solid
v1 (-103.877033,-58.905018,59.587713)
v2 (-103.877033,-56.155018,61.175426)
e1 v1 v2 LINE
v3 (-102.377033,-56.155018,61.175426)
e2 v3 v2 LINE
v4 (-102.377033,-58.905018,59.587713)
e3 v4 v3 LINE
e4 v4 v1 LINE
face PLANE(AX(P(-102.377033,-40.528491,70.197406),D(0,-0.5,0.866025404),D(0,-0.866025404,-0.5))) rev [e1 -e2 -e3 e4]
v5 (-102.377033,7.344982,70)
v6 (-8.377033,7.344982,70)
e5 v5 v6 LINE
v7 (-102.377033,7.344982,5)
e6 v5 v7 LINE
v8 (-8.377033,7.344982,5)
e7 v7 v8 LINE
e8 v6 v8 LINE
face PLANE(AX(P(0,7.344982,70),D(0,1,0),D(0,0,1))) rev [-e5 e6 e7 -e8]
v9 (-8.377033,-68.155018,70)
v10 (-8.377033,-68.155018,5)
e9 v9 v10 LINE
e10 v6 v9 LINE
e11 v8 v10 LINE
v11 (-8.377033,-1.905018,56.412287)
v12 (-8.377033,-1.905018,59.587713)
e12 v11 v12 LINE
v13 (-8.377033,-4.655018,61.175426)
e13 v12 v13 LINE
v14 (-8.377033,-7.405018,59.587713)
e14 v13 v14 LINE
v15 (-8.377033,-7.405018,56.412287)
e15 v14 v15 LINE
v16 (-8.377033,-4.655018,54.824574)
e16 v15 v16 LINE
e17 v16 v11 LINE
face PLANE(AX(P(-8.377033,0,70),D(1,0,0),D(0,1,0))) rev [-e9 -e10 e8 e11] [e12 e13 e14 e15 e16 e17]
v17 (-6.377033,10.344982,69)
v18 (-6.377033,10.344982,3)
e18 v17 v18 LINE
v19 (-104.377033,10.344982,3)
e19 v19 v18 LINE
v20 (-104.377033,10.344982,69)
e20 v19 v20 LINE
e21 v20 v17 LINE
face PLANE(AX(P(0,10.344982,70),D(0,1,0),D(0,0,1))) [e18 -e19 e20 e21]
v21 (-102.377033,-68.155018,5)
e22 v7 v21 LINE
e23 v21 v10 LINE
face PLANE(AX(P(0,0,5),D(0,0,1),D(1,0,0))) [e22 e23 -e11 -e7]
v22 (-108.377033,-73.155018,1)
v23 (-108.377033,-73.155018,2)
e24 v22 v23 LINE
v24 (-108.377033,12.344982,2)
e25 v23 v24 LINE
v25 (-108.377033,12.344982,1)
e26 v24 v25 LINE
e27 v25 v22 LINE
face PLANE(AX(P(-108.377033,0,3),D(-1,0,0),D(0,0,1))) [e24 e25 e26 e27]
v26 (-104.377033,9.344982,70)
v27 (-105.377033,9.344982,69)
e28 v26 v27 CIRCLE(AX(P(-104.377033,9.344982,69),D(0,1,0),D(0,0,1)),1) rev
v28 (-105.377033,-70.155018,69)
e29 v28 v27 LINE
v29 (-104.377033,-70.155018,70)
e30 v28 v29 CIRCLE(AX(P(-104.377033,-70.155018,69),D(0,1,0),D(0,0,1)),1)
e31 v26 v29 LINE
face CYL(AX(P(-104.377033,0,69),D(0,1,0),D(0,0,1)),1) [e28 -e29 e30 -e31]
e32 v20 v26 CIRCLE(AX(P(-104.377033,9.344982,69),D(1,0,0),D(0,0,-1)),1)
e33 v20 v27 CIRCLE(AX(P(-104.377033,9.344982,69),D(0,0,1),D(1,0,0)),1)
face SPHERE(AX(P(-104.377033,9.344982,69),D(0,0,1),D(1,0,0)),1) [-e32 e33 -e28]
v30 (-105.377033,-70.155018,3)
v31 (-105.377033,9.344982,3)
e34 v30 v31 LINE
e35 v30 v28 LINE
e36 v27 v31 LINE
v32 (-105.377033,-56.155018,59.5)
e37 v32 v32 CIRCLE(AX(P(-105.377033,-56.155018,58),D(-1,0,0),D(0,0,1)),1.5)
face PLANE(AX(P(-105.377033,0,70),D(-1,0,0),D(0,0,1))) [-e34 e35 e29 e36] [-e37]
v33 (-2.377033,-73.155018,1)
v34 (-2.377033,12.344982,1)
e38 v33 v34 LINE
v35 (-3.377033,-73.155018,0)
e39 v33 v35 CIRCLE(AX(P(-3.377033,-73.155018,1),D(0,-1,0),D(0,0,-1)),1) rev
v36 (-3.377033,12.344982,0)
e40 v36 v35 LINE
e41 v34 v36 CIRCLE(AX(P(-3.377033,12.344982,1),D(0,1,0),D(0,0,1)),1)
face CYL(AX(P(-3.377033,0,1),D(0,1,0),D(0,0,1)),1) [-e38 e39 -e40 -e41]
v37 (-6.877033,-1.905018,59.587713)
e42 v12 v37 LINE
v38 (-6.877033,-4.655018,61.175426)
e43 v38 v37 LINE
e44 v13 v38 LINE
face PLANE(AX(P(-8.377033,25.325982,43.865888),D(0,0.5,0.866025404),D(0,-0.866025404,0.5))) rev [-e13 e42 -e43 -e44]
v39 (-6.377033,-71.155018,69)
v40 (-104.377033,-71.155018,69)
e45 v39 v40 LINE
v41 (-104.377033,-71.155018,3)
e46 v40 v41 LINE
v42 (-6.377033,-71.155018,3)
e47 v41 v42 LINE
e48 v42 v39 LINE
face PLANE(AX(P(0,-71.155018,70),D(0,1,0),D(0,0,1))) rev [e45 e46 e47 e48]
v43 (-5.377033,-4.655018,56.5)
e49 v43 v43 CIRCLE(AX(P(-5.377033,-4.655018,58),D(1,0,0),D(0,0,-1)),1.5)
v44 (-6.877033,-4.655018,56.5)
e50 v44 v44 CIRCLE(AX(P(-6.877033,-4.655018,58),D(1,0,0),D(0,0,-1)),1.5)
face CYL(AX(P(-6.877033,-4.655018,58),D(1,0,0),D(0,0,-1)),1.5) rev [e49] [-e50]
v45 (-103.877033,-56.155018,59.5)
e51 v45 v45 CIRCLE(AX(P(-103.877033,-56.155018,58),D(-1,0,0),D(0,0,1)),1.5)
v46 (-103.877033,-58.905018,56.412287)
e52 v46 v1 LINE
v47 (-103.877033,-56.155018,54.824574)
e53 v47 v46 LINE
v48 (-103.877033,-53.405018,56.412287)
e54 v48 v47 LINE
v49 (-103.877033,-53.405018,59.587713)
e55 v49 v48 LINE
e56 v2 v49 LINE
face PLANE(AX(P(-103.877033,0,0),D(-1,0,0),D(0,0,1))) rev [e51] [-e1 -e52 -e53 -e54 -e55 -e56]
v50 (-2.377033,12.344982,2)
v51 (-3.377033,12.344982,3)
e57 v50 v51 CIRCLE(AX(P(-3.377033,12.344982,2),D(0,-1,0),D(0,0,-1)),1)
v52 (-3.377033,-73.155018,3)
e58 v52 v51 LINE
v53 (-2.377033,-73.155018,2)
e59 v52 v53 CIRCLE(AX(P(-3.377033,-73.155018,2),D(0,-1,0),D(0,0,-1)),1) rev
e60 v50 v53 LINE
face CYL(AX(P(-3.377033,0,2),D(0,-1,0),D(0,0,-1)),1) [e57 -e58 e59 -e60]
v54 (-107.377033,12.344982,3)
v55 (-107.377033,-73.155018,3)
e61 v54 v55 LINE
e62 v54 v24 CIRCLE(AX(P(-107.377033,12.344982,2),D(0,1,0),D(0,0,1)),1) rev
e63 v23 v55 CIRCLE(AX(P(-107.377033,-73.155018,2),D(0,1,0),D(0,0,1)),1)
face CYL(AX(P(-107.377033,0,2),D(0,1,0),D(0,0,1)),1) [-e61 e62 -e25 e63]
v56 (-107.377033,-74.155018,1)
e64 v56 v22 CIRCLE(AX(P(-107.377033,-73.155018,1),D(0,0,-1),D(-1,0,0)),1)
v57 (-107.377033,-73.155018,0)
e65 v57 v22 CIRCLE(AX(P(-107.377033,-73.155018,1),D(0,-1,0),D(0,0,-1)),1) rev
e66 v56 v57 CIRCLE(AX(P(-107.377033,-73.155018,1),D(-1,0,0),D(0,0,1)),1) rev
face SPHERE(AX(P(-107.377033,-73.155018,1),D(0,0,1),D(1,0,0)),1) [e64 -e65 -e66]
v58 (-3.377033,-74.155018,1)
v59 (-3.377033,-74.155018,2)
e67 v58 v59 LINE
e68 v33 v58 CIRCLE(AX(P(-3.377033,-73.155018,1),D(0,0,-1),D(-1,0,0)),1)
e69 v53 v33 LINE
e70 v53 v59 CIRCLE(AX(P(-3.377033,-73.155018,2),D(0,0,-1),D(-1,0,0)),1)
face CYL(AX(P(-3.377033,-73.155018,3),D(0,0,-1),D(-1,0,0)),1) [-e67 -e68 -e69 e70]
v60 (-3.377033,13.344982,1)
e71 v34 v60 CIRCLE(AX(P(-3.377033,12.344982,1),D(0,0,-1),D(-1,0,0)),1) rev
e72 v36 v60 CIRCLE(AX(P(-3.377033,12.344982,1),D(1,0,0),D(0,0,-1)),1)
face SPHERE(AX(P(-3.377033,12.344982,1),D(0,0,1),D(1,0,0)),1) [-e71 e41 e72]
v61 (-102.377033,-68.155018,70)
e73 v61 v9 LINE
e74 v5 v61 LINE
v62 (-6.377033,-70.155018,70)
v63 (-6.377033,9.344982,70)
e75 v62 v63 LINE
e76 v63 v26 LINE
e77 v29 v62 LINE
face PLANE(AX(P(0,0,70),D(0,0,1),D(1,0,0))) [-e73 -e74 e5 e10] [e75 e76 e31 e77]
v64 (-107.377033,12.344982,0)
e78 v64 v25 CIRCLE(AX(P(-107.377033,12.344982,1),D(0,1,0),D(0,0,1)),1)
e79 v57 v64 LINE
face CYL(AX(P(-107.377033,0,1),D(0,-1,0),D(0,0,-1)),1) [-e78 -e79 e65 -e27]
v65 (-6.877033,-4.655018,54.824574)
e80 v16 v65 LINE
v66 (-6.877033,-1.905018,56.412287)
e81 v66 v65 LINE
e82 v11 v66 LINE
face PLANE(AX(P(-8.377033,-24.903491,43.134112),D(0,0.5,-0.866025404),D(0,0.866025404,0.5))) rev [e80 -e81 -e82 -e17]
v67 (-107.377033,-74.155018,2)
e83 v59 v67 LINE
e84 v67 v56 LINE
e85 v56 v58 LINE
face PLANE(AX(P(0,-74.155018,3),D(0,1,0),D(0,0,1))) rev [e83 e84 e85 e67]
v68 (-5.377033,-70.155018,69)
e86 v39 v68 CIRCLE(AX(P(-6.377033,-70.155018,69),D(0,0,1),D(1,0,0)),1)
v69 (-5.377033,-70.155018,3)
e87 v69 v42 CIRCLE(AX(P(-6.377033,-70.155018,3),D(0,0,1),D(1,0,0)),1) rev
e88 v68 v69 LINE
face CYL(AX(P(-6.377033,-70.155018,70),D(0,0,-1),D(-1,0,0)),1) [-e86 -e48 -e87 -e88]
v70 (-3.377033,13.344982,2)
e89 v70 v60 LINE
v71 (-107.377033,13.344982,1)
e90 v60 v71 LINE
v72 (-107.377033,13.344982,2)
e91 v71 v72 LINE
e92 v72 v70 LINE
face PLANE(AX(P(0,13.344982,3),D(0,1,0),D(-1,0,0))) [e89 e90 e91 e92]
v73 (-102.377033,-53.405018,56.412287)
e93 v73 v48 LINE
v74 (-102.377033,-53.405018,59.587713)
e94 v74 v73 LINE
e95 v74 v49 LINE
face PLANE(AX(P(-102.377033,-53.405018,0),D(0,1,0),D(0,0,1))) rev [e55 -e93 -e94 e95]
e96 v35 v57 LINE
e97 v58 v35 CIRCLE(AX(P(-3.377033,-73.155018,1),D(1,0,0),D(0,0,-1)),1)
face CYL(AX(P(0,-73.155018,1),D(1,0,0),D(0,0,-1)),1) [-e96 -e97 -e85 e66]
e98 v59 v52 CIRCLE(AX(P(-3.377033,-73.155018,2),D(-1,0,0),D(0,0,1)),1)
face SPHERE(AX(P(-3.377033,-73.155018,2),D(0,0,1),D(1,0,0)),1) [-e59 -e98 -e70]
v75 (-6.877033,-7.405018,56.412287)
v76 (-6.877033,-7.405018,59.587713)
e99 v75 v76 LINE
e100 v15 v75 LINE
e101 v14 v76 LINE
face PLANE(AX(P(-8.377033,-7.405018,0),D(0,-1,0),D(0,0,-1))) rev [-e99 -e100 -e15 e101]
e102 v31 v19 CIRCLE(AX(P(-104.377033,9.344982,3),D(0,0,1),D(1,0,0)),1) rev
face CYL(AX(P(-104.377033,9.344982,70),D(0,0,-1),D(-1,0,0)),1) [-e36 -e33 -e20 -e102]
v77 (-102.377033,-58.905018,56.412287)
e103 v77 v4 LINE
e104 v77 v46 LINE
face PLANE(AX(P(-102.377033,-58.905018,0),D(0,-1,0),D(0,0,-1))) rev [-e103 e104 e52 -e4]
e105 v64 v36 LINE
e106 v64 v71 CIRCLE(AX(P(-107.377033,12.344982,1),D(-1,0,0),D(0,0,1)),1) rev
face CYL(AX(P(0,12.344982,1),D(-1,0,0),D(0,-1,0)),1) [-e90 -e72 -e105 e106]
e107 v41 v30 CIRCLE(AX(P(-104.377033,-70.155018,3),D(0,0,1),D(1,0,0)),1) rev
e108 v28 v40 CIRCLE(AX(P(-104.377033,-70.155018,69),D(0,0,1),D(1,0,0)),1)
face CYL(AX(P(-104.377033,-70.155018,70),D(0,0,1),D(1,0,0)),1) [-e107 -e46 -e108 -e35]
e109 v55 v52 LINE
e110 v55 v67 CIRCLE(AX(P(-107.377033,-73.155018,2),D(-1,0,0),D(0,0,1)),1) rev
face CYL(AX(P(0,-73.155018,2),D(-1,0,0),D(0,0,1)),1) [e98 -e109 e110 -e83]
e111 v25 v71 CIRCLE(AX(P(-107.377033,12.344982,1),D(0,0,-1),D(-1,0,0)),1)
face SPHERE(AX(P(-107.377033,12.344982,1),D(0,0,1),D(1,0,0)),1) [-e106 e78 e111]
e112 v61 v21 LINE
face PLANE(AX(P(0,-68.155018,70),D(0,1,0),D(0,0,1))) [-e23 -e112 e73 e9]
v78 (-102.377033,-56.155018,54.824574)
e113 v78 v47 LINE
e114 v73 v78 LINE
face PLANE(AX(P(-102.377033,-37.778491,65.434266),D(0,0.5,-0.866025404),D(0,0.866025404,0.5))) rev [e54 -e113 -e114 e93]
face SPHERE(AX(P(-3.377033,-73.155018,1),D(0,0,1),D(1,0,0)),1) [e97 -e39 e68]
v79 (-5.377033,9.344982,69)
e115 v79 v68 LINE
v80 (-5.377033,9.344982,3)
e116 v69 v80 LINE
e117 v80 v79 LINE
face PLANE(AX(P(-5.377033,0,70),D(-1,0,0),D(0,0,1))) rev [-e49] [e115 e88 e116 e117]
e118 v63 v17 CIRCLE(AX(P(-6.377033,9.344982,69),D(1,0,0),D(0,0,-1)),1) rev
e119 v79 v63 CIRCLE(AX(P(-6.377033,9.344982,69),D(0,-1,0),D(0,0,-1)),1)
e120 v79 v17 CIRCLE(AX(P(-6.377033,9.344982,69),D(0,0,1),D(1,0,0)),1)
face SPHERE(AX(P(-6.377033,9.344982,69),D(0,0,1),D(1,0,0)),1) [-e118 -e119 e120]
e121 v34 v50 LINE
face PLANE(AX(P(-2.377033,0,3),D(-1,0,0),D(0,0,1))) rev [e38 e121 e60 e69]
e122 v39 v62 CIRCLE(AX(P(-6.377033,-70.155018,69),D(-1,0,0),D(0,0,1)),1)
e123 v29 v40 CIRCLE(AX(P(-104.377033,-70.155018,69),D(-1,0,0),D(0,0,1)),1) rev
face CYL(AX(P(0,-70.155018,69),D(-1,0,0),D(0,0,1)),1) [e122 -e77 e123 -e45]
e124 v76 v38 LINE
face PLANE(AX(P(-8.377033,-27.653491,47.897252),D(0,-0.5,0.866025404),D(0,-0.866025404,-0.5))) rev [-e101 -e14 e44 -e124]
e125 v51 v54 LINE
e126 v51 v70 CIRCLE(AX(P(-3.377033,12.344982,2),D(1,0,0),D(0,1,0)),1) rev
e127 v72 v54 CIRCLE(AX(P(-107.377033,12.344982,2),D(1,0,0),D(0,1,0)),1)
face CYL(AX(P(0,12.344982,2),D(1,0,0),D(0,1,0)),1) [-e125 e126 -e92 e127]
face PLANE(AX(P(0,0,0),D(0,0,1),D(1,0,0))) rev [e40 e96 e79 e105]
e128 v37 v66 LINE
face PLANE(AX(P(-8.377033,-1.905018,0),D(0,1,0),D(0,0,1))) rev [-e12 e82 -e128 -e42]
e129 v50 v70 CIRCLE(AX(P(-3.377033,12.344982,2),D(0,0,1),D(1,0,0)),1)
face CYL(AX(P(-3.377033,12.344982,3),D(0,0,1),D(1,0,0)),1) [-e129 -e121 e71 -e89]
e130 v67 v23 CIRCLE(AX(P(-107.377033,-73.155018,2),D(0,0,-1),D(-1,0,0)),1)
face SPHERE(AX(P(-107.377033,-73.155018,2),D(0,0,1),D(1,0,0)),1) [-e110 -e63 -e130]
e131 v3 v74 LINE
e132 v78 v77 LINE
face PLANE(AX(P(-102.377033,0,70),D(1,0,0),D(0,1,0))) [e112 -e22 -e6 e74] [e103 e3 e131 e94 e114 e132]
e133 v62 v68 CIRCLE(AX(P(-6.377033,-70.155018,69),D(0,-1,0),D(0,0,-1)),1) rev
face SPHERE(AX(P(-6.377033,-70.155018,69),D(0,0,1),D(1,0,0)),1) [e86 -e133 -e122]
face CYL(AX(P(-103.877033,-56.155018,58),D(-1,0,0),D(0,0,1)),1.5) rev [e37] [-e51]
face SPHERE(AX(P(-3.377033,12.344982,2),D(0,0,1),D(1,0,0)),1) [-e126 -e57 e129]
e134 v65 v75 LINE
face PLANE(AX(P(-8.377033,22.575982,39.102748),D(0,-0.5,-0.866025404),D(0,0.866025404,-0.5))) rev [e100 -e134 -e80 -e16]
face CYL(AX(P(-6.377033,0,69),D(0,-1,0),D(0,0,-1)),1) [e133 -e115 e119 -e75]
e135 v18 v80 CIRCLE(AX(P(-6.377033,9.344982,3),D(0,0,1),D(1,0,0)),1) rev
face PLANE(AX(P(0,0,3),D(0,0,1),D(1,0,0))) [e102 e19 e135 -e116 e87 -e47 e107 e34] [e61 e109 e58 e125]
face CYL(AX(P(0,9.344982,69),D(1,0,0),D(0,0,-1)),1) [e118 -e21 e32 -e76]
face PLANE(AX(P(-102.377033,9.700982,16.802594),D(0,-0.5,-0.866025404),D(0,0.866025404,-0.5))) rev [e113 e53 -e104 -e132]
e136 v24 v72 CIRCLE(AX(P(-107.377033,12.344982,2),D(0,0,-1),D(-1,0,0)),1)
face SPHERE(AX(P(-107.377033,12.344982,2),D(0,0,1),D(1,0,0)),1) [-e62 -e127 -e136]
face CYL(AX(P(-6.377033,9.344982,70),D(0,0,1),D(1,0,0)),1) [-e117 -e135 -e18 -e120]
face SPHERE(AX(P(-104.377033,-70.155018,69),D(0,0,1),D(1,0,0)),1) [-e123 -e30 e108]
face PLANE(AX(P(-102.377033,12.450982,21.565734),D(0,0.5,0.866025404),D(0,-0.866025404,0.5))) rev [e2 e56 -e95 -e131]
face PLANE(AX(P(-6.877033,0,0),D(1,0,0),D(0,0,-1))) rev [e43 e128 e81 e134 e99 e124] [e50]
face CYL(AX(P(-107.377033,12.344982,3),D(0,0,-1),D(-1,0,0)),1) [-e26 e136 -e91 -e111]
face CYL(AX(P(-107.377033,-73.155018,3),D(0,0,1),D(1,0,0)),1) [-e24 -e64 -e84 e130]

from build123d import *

# Parameters (mm, degrees)
ESQUISSE1_W             = 106
ESQUISSE1_H             = 87.5
ESQUISSE1_W_2           = 100
ESQUISSE1_H_2           = 81.5
BOSS_EXTRU_1_DEPTH      = 3
ESQUISSE1_32_W          = 100
ESQUISSE1_32_H          = 81.5
ESQUISSE1_32_W_2        = 94
ESQUISSE1_32_H_2        = 75.5
BOSS_EXTRU_2_DEPTH      = 70
ESQUISSE1_33_W          = 94
ESQUISSE1_33_H          = 75.5
BOSS_EXTRU_3_DEPTH      = 5
CONG_1_R                = 1
CONG_2_R                = 1
CONG_3_R                = 1
ESQUISSE13_R            = 1.5
ENL_V_MAT_EXTRU_1_DEPTH = 3
ESQUISSE13_3_R          = 1.5
ENL_V_MAT_EXTRU_2_DEPTH = 3
ESQUISSE13_4_R          = 1.5
BOSS_EXTRU_6_DEPTH      = 1.5
ESQUISSE11_R            = 1.5
ENL_V_MAT_EXTRU_6_DEPTH = 3
ESQUISSE11_11_R         = 5
ESQUISSE11_11_R_2       = 1.5
BOSS_EXTRU_8_DEPTH      = 1.5
ESQUISSE11_12_R         = 1.5
ENL_V_MAT_EXTRU_7_DEPTH = 1.5
CONG_5_R                = 1


with BuildPart() as part:
    # Esquisse1 → Boss.-Extru.1 (new body)
    with BuildSketch(Plane.XY):
        with Locations((-55.377032771, -30.405018472)):
            Rectangle(ESQUISSE1_W, ESQUISSE1_H)
        with Locations((-55.377032771, -30.405018472)):
            Rectangle(ESQUISSE1_W_2, ESQUISSE1_H_2, mode=Mode.SUBTRACT)
    extrude(amount=BOSS_EXTRU_1_DEPTH)

    # Esquisse1<32> → Boss.-Extru.2 (add)
    with BuildSketch(Plane.XY):
        with Locations((-55.377032771, -30.405018472)):
            Rectangle(ESQUISSE1_32_W, ESQUISSE1_32_H)
        with Locations((-55.377032771, -30.405018472)):
            Rectangle(ESQUISSE1_32_W_2, ESQUISSE1_32_H_2, mode=Mode.SUBTRACT)
    extrude(amount=BOSS_EXTRU_2_DEPTH)

    # Esquisse1<33> → Boss.-Extru.3 (add)
    with BuildSketch(Plane.XY):
        with Locations((-55.377032771, -30.405018472)):
            Rectangle(ESQUISSE1_33_W, ESQUISSE1_33_H)
    extrude(amount=BOSS_EXTRU_3_DEPTH)

    # Congé1
    cong_1_edges = [part.edges().sort_by_distance(p)[0] for p in [
        (-55.377032771, 10.344981528, 70),
        (-105.377032771, -30.405018472, 70),
        (-55.377032771, -71.155018472, 70),
        (-5.377032771, -30.405018472, 70),
    ]]
    fillet(cong_1_edges, radius=CONG_1_R)

    # Congé2
    cong_2_edges = [part.edges().sort_by_distance(p)[0] for p in [
        (-55.377032771, -74.155018472, 3),
        (-2.377032771, -30.405018472, 3),
        (-55.377032771, 13.344981528, 3),
        (-108.377032771, -30.405018472, 3),
    ]]
    fillet(cong_2_edges, radius=CONG_2_R)

    # Congé3
    # the kernel refuses this fillet: 1 mm, written as the material it takes off along each edge
    with BuildSketch(Plane(origin=(-107.377032771, -73.155018472, 2), x_dir=(-1, 0, 0), z_dir=(0, -1, 0))) as cong_3_piece_1_section:
        Polygon((0, 0), (CONG_3_R, 0), (CONG_3_R, -CONG_3_R), (0, -CONG_3_R), align=None)
    cong_3_piece_1 = extrude(amount=CONG_3_R, mode=Mode.PRIVATE)
    cong_3_piece_1 = cong_3_piece_1 - Plane(origin=(-107.377032771, -73.155018472, 2), x_dir=(0.7071067811865475, 0, -0.7071067811865475), z_dir=(0, -1, 0)) * Sphere(CONG_3_R, mode=Mode.PRIVATE)
    add(cong_3_piece_1, mode=Mode.SUBTRACT)
    with BuildSketch(Plane(origin=(-107.377032771, 12.344981528, 2), x_dir=(0, 1, 0), z_dir=(-1, 0, 0))) as cong_3_piece_2_section:
        Polygon((0, 0), (CONG_3_R, 0), (CONG_3_R, -CONG_3_R), (0, -CONG_3_R), align=None)
    cong_3_piece_2 = extrude(amount=CONG_3_R, mode=Mode.PRIVATE)
    cong_3_piece_2 = cong_3_piece_2 - Plane(origin=(-107.377032771, 12.344981528, 2), x_dir=(0, -0.7071067811865475, -0.7071067811865475), z_dir=(-1, 0, 0)) * Sphere(CONG_3_R, mode=Mode.PRIVATE)
    add(cong_3_piece_2, mode=Mode.SUBTRACT)
    with BuildSketch(Plane(origin=(-3.377032771, -73.155018472, 2), x_dir=(1, 0, 0), z_dir=(0, -1, 0))) as cong_3_piece_3_section:
        Polygon((0, 0), (CONG_3_R, 0), (CONG_3_R, CONG_3_R), (0, CONG_3_R), align=None)
    cong_3_piece_3 = extrude(amount=CONG_3_R, mode=Mode.PRIVATE)
    cong_3_piece_3 = cong_3_piece_3 - Plane(origin=(-3.377032771, -73.155018472, 2), x_dir=(-0.7071067811865475, 0, -0.7071067811865475), z_dir=(0, -1, 0)) * Sphere(CONG_3_R, mode=Mode.PRIVATE)
    add(cong_3_piece_3, mode=Mode.SUBTRACT)
    with BuildSketch(Plane(origin=(-3.377032771, 12.344981528, 2), x_dir=(0, 1, 0), z_dir=(1, 0, 0))) as cong_3_piece_4_section:
        Polygon((0, 0), (CONG_3_R, 0), (CONG_3_R, CONG_3_R), (0, CONG_3_R), align=None)
    cong_3_piece_4 = extrude(amount=CONG_3_R, mode=Mode.PRIVATE)
    cong_3_piece_4 = cong_3_piece_4 - Plane(origin=(-3.377032771, 12.344981528, 2), x_dir=(0, -0.7071067811865475, -0.7071067811865475), z_dir=(1, 0, 0)) * Sphere(CONG_3_R, mode=Mode.PRIVATE)
    add(cong_3_piece_4, mode=Mode.SUBTRACT)
    with BuildSketch(Plane(origin=(-3.377032771, -73.155018472, 1), x_dir=(1, 0, 0), z_dir=(0, 0, -1))) as cong_3_piece_5_section:
        Polygon((0, 0), (CONG_3_R, 0), (CONG_3_R, CONG_3_R), (0, CONG_3_R), align=None)
    cong_3_piece_5 = extrude(amount=CONG_3_R, mode=Mode.PRIVATE)
    cong_3_piece_5 = cong_3_piece_5 - Plane(origin=(-3.377032771, -73.155018472, 1), x_dir=(-0.7071067811865475, 0.7071067811865475, 0), z_dir=(0, 0, -1)) * Sphere(CONG_3_R, mode=Mode.PRIVATE)
    add(cong_3_piece_5, mode=Mode.SUBTRACT)
    with BuildSketch(Plane(origin=(-3.377032771, 12.344981528, 1), x_dir=(1, 0, 0), z_dir=(0, 0, -1))) as cong_3_piece_6_section:
        Polygon((0, 0), (CONG_3_R, 0), (CONG_3_R, -CONG_3_R), (0, -CONG_3_R), align=None)
    cong_3_piece_6 = extrude(amount=CONG_3_R, mode=Mode.PRIVATE)
    cong_3_piece_6 = cong_3_piece_6 - Plane(origin=(-3.377032771, 12.344981528, 1), x_dir=(-0.7071067811865475, -0.7071067811865475, 0), z_dir=(0, 0, -1)) * Sphere(CONG_3_R, mode=Mode.PRIVATE)
    add(cong_3_piece_6, mode=Mode.SUBTRACT)
    with BuildSketch(Plane(origin=(-107.377032771, -73.155018472, 1), x_dir=(-1, 0, 0), z_dir=(0, -1, 0))) as cong_3_piece_7_section:
        Polygon((0, 0), (CONG_3_R, 0), (CONG_3_R, CONG_3_R), (0, CONG_3_R), align=None)
    cong_3_piece_7 = extrude(amount=CONG_3_R, mode=Mode.PRIVATE)
    cong_3_piece_7 = cong_3_piece_7 - Plane(origin=(-107.377032771, -73.155018472, 1), x_dir=(0.7071067811865475, 0, 0.7071067811865475), z_dir=(0, -1, 0)) * Sphere(CONG_3_R, mode=Mode.PRIVATE)
    add(cong_3_piece_7, mode=Mode.SUBTRACT)
    with BuildSketch(Plane(origin=(-107.377032771, 12.344981528, 1), x_dir=(-1, 0, 0), z_dir=(0, 0, -1))) as cong_3_piece_8_section:
        Polygon((0, 0), (CONG_3_R, 0), (CONG_3_R, CONG_3_R), (0, CONG_3_R), align=None)
    cong_3_piece_8 = extrude(amount=CONG_3_R, mode=Mode.PRIVATE)
    cong_3_piece_8 = cong_3_piece_8 - Plane(origin=(-107.377032771, 12.344981528, 1), x_dir=(0.7071067811865475, -0.7071067811865475, 0), z_dir=(0, 0, -1)) * Sphere(CONG_3_R, mode=Mode.PRIVATE)
    add(cong_3_piece_8, mode=Mode.SUBTRACT)
    with BuildSketch(Plane(origin=(-2.377032771, -73.155018472, 0), x_dir=(0, 0, 1), z_dir=(0, 1, 0)), Plane(origin=(-108.377032771, 12.344981528, 0), x_dir=(0, 0, 1), z_dir=(0, -1, 0))) as cong_3_piece_9:
        with BuildLine():
            CenterArc((CONG_3_R, -CONG_3_R), CONG_3_R, 90, 90)
            Line((0, -CONG_3_R), (0, 0))
            Line((0, 0), (CONG_3_R, 0))
        make_face()
    extrude(amount=85.5, mode=Mode.SUBTRACT)
    with BuildSketch(Plane(origin=(-107.377032771, -74.155018472, 0), x_dir=(0, 0, 1), z_dir=(1, 0, 0)), Plane(origin=(-3.377032771, 13.344981528, 0), x_dir=(0, 0, 1), z_dir=(-1, 0, 0))) as cong_3_piece_10:
        with BuildLine():
            CenterArc((CONG_3_R, -CONG_3_R), CONG_3_R, 90, 90)
            Line((0, -CONG_3_R), (0, 0))
            Line((0, 0), (CONG_3_R, 0))
        make_face()
    extrude(amount=104, mode=Mode.SUBTRACT)
    with BuildSketch(Plane(origin=(-2.377032771, 13.344981528, 1), x_dir=(0, -1, 0), z_dir=(0, 0, 1)), Plane(origin=(-2.377032771, -74.155018472, 1), x_dir=(-1, 0, 0), z_dir=(0, 0, 1))) as cong_3_piece_11:
        with BuildLine():
            CenterArc((CONG_3_R, -CONG_3_R), CONG_3_R, 90, 90)
            Line((0, -CONG_3_R), (0, 0))
            Line((0, 0), (CONG_3_R, 0))
        make_face()
    extrude(amount=1, mode=Mode.SUBTRACT)
    with BuildSketch(Plane(origin=(-108.377032771, 13.344981528, 1), x_dir=(0, -1, 0), z_dir=(0, 0, 1)), Plane(origin=(-108.377032771, -74.155018472, 1), x_dir=(1, 0, 0), z_dir=(0, 0, 1))) as cong_3_piece_12:
        with BuildLine():
            CenterArc((CONG_3_R, CONG_3_R), CONG_3_R, 180, 90)
            Line((0, CONG_3_R), (0, 0))
            Line((0, 0), (CONG_3_R, 0))
        make_face()
    extrude(amount=1, mode=Mode.SUBTRACT)

    # Esquisse13 → Enlèv. mat.-Extru.1 (cut)
    with BuildSketch(Plane.ZY.offset(105.377032771)):
        with Locations((58, -56.155018472)):
            Circle(ESQUISSE13_R)
    extrude(amount=-ENL_V_MAT_EXTRU_1_DEPTH, mode=Mode.SUBTRACT)

    # Esquisse13<3> → Enlèv. mat.-Extru.2 (cut)
    with BuildSketch(Plane.ZY.offset(105.377032771)):
        Polygon((56.41228676, -58.905018472), (59.58771324, -58.905018472), (61.175426481, -56.155018472), (59.58771324, -53.405018472), (56.41228676, -53.405018472), (54.824573519, -56.155018472), align=None)
        with Locations((58, -56.155018472)):
            Circle(ESQUISSE13_3_R, mode=Mode.SUBTRACT)
    extrude(amount=-ENL_V_MAT_EXTRU_2_DEPTH, mode=Mode.SUBTRACT)

    # Esquisse13<4> → Boss.-Extru.6 (add)
    with BuildSketch(Plane.ZY.offset(105.377032771)):
        Polygon((56.41228676, -58.905018472), (59.58771324, -58.905018472), (61.175426481, -56.155018472), (59.58771324, -53.405018472), (56.41228676, -53.405018472), (54.824573519, -56.155018472), align=None)
        with Locations((58, -56.155018472)):
            Circle(ESQUISSE13_4_R, mode=Mode.SUBTRACT)
    extrude(amount=-BOSS_EXTRU_6_DEPTH)

    # Esquisse11 → Enlèv. mat.-Extru.6 (cut)
    # profile 1 of 2: a face of its own
    with BuildSketch(Plane(origin=(-5.377032771, 0, 0), x_dir=(0, 0, -1), z_dir=(1, 0, 0))):
        Polygon((-59.58771324, -7.405018472), (-56.41228676, -7.405018472), (-54.824573519, -4.655018472), (-56.41228676, -1.905018472), (-59.58771324, -1.905018472), (-61.175426481, -4.655018472), align=None)
        with Locations((-58, -4.655018472)):
            Circle(ESQUISSE11_R, mode=Mode.SUBTRACT)
    # profile 2 of 2: a face of its own
    with BuildSketch(Plane(origin=(-5.377032771, 0, 0), x_dir=(0, 0, -1), z_dir=(1, 0, 0))):
        with Locations((-58, -4.655018472)):
            Circle(ESQUISSE11_R)
    extrude(amount=-ENL_V_MAT_EXTRU_6_DEPTH, mode=Mode.SUBTRACT)

    # Esquisse11<11> → Boss.-Extru.8 (add)
    # profile 1 of 3: a face of its own
    with BuildSketch(Plane(origin=(-5.377032771, 0, 0), x_dir=(0, 0, -1), z_dir=(1, 0, 0))):
        with Locations((-58, -4.655018472)):
            Circle(ESQUISSE11_11_R)
        Polygon((-56.41228676, -7.405018472), (-54.824573519, -4.655018472), (-56.41228676, -1.905018472), (-59.58771324, -1.905018472), (-61.175426481, -4.655018472), (-59.58771324, -7.405018472), align=None, mode=Mode.SUBTRACT)
    # profile 2 of 3: a face of its own
    with BuildSketch(Plane(origin=(-5.377032771, 0, 0), x_dir=(0, 0, -1), z_dir=(1, 0, 0))):
        Polygon((-59.58771324, -7.405018472), (-56.41228676, -7.405018472), (-54.824573519, -4.655018472), (-56.41228676, -1.905018472), (-59.58771324, -1.905018472), (-61.175426481, -4.655018472), align=None)
        with Locations((-58, -4.655018472)):
            Circle(ESQUISSE11_11_R_2, mode=Mode.SUBTRACT)
    # profile 3 of 3: a face of its own
    with BuildSketch(Plane(origin=(-5.377032771, 0, 0), x_dir=(0, 0, -1), z_dir=(1, 0, 0))):
        with Locations((-58, -4.655018472)):
            Circle(ESQUISSE11_11_R_2)
    extrude(amount=-BOSS_EXTRU_8_DEPTH)

    # Esquisse11<12> → Enlèv. mat.-Extru.7 (cut)
    with BuildSketch(Plane(origin=(-5.377032771, 0, 0), x_dir=(0, 0, -1), z_dir=(1, 0, 0))):
        with Locations((-58, -4.655018472)):
            Circle(ESQUISSE11_12_R)
    extrude(amount=-ENL_V_MAT_EXTRU_7_DEPTH, mode=Mode.SUBTRACT)

    # Congé5
    # the kernel refuses this fillet: 1 mm, written as the material it takes off along each edge
    with BuildSketch(Plane(origin=(-104.377032771, 9.344981528, 69), x_dir=(0, 1, 0), z_dir=(-1, 0, 0))) as cong_5_piece_1_section:
        Polygon((0, 0), (CONG_5_R, 0), (CONG_5_R, -CONG_5_R), (0, -CONG_5_R), align=None)
    cong_5_piece_1 = extrude(amount=CONG_5_R, mode=Mode.PRIVATE)
    cong_5_piece_1 = cong_5_piece_1 - Plane(origin=(-104.377032771, 9.344981528, 69), x_dir=(0, -0.7071067811865475, -0.7071067811865475), z_dir=(-1, 0, 0)) * Sphere(CONG_5_R, mode=Mode.PRIVATE)
    with BuildSketch(Plane(origin=(-6.377032771, 9.344981528, 69), x_dir=(1, 0, 0), z_dir=(0, 1, 0))) as cong_5_piece_2_section:
        Polygon((0, 0), (CONG_5_R, 0), (CONG_5_R, -CONG_5_R), (0, -CONG_5_R), align=None)
    cong_5_piece_2 = extrude(amount=CONG_5_R, mode=Mode.PRIVATE)
    cong_5_piece_2 = cong_5_piece_2 - Plane(origin=(-6.377032771, 9.344981528, 69), x_dir=(-0.7071067811865475, 0, -0.7071067811865475), z_dir=(0, 1, 0)) * Sphere(CONG_5_R, mode=Mode.PRIVATE)
    with BuildSketch(Plane(origin=(-104.377032771, -70.155018472, 69), x_dir=(-1, 0, 0), z_dir=(0, -1, 0))) as cong_5_piece_3_section:
        Polygon((0, 0), (CONG_5_R, 0), (CONG_5_R, -CONG_5_R), (0, -CONG_5_R), align=None)
    cong_5_piece_3 = extrude(amount=CONG_5_R, mode=Mode.PRIVATE)
    cong_5_piece_3 = cong_5_piece_3 - Plane(origin=(-104.377032771, -70.155018472, 69), x_dir=(0.7071067811865475, 0, -0.7071067811865475), z_dir=(0, -1, 0)) * Sphere(CONG_5_R, mode=Mode.PRIVATE)
    with BuildSketch(Plane(origin=(-6.377032771, -70.155018472, 69), x_dir=(1, 0, 0), z_dir=(0, -1, 0))) as cong_5_piece_4_section:
        Polygon((0, 0), (CONG_5_R, 0), (CONG_5_R, CONG_5_R), (0, CONG_5_R), align=None)
    cong_5_piece_4 = extrude(amount=CONG_5_R, mode=Mode.PRIVATE)
    cong_5_piece_4 = cong_5_piece_4 - Plane(origin=(-6.377032771, -70.155018472, 69), x_dir=(-0.7071067811865475, 0, -0.7071067811865475), z_dir=(0, -1, 0)) * Sphere(CONG_5_R, mode=Mode.PRIVATE)
    with BuildSketch(Plane(origin=(-5.377032771, -71.155018472, 3), x_dir=(-1, 0, 0), z_dir=(0, 0, 1))) as cong_5_piece_5:
        with BuildLine():
            CenterArc((CONG_5_R, -CONG_5_R), CONG_5_R, 90, 90)
            Line((0, -CONG_5_R), (0, 0))
            Line((0, 0), (CONG_5_R, 0))
        make_face()
    cong_5_piece_5_solid = extrude(amount=66, mode=Mode.PRIVATE)
    with BuildSketch(Plane(origin=(-105.377032771, -71.155018472, 3), x_dir=(1, 0, 0), z_dir=(0, 0, 1)), Plane(origin=(-5.377032771, 10.344981528, 3), x_dir=(-1, 0, 0), z_dir=(0, 0, 1)), Plane(origin=(-105.377032771, 10.344981528, 3), x_dir=(0, -1, 0), z_dir=(0, 0, 1))) as cong_5_piece_6:
        with BuildLine():
            CenterArc((CONG_5_R, CONG_5_R), CONG_5_R, 180, 90)
            Line((0, CONG_5_R), (0, 0))
            Line((0, 0), (CONG_5_R, 0))
        make_face()
    cong_5_piece_6_solid = extrude(amount=66, mode=Mode.PRIVATE)
    add([cong_5_piece_1, cong_5_piece_2, cong_5_piece_3, cong_5_piece_4, cong_5_piece_5_solid, cong_5_piece_6_solid], mode=Mode.SUBTRACT)


solid = part.part
